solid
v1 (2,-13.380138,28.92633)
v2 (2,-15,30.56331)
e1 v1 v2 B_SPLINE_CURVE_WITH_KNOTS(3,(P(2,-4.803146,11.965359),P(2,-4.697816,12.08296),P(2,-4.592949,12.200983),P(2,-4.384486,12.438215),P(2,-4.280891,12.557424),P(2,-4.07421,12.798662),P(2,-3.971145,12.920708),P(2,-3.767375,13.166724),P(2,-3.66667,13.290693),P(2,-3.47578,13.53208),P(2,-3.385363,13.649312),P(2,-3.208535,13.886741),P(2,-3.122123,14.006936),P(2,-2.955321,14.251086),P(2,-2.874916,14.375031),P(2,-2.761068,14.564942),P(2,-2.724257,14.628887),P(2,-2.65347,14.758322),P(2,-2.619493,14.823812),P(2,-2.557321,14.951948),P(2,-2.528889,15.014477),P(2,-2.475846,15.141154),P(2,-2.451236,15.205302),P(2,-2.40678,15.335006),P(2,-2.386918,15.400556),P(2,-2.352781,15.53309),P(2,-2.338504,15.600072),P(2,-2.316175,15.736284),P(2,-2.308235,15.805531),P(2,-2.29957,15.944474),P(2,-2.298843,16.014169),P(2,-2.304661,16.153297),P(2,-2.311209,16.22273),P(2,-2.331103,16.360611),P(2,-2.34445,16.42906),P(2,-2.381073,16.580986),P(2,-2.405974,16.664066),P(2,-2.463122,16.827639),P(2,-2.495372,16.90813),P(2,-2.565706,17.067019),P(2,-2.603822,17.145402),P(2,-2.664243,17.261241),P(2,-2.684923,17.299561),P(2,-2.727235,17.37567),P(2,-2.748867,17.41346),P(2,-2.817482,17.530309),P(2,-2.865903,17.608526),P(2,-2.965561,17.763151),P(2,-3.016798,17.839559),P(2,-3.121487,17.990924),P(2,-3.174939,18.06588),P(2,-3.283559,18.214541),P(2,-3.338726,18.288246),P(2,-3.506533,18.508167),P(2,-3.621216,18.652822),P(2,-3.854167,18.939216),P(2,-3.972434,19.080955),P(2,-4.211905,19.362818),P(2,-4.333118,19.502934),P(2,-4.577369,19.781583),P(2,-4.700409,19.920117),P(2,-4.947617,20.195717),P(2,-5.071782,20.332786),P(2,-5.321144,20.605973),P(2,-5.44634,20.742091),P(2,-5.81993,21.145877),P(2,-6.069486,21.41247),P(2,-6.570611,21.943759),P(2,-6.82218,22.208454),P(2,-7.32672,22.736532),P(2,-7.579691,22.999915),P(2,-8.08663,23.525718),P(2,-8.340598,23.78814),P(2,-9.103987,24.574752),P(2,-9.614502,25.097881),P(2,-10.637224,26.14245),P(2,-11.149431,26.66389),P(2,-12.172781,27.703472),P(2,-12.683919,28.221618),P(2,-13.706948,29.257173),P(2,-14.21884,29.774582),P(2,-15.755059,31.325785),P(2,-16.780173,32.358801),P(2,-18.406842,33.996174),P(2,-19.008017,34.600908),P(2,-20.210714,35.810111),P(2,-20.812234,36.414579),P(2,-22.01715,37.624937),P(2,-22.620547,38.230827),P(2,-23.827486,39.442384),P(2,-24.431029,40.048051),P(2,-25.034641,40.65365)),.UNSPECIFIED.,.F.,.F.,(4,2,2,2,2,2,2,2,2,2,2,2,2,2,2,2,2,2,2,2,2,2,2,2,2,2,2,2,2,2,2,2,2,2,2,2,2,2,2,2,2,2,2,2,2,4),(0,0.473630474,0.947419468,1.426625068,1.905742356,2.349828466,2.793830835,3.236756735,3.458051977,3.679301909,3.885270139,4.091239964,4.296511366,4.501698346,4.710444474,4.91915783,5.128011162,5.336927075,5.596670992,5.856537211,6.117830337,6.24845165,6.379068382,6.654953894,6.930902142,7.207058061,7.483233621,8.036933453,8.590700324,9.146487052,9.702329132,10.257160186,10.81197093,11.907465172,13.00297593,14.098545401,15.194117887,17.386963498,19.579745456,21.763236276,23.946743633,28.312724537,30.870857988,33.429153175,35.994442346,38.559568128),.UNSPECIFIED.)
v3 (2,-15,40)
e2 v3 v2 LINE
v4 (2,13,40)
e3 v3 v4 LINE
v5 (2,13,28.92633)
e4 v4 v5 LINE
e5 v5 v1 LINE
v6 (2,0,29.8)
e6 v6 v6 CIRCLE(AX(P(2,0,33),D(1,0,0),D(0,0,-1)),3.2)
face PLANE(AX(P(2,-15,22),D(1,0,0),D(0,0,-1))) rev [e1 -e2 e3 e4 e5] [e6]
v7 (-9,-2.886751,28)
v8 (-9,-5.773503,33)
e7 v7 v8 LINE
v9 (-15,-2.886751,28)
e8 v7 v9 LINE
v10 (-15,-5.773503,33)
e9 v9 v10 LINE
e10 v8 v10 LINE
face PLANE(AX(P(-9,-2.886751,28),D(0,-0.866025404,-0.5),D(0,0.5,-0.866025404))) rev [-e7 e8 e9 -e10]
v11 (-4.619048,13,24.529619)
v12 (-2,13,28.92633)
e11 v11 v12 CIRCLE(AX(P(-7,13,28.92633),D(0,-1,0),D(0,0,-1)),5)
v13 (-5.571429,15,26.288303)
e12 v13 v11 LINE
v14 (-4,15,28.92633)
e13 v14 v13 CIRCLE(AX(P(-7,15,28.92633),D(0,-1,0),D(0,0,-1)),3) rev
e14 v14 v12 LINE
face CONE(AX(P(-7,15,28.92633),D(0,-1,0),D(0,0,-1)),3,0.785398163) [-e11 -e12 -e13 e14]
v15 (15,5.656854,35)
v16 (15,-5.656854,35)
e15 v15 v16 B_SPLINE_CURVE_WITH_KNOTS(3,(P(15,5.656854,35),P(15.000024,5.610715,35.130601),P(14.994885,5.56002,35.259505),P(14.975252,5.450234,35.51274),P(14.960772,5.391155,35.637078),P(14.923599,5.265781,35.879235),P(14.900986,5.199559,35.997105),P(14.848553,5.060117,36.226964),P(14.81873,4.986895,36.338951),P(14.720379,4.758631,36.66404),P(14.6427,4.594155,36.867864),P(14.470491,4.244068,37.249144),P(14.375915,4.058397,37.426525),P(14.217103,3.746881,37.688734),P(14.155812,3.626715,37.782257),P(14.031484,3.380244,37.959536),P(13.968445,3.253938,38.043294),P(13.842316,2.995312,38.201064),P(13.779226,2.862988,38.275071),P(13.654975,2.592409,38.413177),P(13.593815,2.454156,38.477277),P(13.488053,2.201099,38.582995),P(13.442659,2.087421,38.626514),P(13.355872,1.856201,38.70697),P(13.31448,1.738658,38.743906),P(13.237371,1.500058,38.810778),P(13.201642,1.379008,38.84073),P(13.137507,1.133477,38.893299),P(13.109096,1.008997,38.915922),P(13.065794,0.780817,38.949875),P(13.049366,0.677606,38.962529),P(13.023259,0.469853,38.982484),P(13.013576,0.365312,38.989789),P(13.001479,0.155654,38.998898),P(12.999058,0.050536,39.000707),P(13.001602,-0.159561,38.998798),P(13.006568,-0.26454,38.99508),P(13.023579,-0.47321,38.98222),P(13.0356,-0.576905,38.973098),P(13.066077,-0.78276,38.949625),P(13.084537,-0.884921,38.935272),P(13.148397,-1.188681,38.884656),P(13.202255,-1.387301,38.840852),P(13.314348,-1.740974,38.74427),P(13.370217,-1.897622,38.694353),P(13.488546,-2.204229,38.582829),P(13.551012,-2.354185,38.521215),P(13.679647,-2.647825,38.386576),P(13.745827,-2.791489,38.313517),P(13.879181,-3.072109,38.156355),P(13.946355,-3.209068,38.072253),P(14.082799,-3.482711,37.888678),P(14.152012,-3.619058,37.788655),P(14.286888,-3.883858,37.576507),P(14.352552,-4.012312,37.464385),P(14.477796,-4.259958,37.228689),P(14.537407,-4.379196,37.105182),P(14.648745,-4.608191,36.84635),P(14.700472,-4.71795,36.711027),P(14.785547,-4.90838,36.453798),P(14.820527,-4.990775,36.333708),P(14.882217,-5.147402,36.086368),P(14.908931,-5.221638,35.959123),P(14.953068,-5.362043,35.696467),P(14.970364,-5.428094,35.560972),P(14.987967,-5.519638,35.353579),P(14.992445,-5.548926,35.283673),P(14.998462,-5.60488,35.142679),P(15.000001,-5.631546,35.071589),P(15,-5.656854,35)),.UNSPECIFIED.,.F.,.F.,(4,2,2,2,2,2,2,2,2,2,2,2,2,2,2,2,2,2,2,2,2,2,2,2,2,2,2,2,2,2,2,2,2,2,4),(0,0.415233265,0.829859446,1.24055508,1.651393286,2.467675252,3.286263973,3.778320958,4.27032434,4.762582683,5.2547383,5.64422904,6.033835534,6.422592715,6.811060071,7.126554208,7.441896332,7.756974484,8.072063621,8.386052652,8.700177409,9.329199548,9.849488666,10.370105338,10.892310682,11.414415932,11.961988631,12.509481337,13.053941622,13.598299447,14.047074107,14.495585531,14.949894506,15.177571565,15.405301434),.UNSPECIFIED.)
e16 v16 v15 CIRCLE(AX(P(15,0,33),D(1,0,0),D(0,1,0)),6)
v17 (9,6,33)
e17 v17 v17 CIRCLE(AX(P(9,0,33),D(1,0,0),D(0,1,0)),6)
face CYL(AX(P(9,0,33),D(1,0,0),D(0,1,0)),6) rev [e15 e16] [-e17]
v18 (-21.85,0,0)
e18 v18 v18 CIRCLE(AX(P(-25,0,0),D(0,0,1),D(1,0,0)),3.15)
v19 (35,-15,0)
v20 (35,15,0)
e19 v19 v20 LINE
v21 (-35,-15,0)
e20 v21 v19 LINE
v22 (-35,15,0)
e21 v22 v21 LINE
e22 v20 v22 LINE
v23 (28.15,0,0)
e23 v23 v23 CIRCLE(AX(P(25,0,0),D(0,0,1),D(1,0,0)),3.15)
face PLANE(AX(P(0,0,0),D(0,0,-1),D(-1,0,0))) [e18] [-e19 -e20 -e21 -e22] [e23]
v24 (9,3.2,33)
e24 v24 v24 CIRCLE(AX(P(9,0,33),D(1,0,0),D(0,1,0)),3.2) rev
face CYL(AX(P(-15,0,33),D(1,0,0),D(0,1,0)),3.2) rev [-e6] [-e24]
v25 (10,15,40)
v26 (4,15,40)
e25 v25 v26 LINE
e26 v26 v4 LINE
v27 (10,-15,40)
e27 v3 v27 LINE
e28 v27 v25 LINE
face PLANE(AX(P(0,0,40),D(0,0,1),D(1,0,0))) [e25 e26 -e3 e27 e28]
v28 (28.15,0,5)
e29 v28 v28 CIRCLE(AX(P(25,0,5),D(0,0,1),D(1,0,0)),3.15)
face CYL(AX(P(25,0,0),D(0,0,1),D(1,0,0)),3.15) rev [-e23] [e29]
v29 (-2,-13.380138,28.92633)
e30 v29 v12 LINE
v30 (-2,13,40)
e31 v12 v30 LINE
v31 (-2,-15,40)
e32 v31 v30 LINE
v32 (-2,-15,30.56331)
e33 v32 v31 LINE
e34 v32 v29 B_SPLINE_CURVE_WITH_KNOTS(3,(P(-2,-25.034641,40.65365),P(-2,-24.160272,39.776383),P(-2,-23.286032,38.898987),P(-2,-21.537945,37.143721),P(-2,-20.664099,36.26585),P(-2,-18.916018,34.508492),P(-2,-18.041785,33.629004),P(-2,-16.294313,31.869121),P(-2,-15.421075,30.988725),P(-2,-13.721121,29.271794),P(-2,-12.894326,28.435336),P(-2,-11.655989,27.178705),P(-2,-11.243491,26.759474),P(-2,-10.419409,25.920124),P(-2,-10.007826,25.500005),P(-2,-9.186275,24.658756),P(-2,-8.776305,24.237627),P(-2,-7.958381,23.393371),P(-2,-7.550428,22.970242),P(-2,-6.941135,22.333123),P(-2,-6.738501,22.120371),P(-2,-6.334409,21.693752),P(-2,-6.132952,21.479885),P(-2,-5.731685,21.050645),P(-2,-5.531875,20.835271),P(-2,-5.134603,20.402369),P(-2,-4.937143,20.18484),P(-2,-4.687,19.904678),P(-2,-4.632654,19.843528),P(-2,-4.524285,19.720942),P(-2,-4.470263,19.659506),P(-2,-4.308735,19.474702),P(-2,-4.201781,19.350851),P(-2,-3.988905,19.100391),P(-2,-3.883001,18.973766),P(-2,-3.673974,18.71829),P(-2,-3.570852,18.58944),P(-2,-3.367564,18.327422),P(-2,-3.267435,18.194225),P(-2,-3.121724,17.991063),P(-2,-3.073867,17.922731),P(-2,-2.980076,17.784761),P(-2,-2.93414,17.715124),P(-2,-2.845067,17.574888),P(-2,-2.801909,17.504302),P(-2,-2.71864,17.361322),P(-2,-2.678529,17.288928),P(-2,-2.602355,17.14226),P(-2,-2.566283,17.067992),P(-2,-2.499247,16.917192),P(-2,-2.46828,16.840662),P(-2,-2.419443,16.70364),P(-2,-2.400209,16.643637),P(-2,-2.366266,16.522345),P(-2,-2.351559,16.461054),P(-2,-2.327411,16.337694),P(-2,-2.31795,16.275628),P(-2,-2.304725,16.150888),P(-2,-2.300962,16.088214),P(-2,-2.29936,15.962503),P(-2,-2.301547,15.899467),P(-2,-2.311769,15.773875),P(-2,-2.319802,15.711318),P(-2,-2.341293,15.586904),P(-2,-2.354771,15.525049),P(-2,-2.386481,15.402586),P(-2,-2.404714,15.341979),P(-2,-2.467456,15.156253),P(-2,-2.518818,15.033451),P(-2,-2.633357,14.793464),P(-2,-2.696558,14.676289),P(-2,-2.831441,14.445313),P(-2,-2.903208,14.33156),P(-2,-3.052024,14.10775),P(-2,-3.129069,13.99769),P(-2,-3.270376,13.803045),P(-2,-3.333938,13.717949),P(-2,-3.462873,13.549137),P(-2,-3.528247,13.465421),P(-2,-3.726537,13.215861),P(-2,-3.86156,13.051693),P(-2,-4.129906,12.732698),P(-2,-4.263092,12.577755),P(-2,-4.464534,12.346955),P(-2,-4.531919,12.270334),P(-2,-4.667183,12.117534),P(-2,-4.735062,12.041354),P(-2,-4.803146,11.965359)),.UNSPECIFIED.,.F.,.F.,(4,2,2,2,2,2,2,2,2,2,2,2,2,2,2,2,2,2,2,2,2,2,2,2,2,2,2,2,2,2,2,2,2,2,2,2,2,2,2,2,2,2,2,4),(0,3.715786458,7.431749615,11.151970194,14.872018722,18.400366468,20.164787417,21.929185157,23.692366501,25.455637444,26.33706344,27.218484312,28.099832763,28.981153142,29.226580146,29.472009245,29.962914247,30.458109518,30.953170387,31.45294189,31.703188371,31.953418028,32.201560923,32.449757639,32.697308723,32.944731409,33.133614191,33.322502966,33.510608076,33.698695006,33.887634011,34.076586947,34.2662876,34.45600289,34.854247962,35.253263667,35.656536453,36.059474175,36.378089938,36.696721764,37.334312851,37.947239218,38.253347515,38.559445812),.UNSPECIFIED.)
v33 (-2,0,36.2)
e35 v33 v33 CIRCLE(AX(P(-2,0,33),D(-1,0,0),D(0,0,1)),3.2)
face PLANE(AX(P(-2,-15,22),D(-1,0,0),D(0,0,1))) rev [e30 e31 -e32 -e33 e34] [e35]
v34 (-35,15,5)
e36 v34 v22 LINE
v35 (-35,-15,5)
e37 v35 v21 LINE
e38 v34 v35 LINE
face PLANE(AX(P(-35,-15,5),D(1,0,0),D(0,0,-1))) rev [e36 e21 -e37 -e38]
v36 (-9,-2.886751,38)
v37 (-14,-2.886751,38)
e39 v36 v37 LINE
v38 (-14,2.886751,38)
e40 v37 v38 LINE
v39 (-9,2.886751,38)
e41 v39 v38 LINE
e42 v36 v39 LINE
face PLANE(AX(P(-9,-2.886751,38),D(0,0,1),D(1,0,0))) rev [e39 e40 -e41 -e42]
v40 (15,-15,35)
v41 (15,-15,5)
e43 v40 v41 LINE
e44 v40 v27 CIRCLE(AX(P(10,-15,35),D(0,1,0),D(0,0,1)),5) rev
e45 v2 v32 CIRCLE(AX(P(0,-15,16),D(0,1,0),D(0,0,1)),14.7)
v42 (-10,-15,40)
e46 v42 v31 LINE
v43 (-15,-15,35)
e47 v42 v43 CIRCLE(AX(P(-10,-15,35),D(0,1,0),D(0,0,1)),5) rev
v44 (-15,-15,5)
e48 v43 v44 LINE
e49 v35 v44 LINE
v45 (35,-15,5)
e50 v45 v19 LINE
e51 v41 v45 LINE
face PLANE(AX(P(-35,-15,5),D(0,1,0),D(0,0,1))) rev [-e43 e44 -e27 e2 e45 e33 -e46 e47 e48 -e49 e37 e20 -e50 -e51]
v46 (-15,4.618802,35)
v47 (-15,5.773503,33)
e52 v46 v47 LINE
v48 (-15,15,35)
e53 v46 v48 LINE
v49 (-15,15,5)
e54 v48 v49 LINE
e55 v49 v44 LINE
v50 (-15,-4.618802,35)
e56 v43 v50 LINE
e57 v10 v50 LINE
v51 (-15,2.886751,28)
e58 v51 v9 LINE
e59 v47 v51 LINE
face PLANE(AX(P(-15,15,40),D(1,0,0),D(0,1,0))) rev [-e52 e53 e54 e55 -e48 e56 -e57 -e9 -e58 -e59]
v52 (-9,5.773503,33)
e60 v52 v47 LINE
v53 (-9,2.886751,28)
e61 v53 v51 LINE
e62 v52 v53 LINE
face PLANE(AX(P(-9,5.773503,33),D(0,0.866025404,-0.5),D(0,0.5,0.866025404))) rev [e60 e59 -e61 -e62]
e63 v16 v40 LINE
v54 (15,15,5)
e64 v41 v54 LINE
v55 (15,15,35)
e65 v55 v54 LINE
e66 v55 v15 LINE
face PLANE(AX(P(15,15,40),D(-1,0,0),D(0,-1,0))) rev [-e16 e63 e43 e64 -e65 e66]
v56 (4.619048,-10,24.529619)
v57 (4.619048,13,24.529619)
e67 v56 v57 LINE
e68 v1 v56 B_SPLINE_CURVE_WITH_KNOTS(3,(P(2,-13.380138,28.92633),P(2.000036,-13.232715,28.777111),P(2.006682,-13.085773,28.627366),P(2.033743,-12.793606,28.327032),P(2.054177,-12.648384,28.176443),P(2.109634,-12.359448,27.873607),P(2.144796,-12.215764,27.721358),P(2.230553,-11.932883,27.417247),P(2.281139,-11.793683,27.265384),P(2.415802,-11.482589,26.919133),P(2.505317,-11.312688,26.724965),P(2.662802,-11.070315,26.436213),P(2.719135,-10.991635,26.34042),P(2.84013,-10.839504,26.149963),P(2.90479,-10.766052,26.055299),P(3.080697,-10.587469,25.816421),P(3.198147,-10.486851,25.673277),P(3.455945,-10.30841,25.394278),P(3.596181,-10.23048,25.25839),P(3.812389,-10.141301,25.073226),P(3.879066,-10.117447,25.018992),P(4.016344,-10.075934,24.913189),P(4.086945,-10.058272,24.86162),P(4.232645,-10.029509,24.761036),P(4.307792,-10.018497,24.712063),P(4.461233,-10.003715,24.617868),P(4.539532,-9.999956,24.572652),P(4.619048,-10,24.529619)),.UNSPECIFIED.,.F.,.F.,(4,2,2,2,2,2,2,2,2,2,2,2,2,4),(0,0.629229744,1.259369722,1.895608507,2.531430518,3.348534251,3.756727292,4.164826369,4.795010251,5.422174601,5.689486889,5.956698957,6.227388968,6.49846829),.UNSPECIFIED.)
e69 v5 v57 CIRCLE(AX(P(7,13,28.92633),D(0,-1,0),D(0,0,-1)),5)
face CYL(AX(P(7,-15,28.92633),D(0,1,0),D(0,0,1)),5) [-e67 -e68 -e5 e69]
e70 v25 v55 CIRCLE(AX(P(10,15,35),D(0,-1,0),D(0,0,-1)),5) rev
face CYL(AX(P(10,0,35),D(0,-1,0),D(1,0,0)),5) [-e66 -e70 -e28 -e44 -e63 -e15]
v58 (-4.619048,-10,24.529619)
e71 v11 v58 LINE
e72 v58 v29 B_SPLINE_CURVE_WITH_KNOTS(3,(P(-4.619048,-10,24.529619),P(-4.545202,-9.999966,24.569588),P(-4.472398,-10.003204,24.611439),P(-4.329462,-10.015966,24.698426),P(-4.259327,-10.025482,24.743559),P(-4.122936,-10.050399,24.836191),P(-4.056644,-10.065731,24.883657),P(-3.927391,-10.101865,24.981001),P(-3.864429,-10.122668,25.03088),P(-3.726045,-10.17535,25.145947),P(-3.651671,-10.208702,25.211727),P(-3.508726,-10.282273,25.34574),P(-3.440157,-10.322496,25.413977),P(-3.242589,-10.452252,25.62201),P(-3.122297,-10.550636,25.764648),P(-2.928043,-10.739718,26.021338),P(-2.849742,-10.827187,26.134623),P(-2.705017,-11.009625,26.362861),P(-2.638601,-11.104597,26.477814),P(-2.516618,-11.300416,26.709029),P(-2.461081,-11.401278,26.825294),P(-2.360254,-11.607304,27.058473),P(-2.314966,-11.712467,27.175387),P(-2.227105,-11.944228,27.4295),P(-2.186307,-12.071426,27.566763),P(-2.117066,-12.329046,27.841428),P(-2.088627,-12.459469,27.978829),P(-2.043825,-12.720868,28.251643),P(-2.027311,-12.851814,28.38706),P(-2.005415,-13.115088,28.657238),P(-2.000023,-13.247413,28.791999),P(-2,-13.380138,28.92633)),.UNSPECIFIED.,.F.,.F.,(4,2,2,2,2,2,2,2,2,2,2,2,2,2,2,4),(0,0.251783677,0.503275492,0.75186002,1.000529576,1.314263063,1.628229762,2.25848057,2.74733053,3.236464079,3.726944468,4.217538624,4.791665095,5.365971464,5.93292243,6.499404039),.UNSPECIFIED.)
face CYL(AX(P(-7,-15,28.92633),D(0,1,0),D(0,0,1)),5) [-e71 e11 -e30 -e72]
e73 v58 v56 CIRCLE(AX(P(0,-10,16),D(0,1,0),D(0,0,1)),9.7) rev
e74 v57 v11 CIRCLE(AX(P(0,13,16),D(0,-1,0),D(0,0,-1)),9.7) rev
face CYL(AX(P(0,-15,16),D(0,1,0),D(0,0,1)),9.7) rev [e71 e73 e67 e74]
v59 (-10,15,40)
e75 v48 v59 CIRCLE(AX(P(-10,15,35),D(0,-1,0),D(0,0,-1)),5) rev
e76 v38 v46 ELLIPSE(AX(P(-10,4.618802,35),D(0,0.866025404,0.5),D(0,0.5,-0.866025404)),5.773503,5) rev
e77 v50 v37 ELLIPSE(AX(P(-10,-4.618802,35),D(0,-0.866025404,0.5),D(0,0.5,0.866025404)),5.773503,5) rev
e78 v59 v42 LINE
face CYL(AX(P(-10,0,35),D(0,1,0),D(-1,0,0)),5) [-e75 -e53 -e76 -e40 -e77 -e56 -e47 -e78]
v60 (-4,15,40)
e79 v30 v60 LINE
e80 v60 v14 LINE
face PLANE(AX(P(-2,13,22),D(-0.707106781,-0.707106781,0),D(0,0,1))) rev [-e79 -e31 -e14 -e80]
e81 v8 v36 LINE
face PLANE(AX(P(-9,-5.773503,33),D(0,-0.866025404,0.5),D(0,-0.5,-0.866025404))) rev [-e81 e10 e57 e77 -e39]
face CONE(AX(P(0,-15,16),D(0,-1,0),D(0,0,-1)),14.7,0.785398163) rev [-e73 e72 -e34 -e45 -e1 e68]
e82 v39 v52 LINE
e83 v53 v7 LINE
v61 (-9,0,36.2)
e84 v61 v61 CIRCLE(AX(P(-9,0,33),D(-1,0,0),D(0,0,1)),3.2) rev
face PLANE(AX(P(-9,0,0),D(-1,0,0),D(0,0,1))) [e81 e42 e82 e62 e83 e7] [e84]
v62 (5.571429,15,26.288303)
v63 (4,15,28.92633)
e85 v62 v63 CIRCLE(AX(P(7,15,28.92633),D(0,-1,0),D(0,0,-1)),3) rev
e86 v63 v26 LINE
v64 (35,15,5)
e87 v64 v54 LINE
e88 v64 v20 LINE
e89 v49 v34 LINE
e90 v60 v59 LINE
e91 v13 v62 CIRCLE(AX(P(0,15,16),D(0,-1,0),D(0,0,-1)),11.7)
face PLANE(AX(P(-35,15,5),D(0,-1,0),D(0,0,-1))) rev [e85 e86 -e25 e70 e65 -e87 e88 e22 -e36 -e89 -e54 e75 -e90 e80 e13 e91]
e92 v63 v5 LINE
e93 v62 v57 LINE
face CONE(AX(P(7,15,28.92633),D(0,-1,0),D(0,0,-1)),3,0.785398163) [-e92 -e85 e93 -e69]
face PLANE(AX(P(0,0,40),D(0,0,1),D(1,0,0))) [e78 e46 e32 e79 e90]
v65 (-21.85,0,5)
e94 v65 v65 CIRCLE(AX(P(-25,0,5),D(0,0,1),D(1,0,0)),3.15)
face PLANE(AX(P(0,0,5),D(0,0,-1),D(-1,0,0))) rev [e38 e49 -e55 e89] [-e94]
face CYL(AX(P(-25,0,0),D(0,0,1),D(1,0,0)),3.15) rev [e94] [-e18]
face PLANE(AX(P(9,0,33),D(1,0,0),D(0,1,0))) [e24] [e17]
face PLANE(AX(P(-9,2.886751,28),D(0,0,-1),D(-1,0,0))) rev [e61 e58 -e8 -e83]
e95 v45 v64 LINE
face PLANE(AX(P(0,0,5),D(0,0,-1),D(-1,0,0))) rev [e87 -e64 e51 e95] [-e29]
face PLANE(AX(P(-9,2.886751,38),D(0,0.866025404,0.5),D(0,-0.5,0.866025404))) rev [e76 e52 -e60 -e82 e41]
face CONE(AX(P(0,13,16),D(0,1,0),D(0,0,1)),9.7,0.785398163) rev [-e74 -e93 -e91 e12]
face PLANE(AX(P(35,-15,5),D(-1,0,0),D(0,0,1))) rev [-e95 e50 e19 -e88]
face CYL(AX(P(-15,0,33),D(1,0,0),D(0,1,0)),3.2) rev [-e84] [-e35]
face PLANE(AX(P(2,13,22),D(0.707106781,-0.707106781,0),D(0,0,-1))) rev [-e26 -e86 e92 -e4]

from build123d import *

# Parameters (mm, degrees)
SKETCH_1_W          = 70
SKETCH_1_H          = 30
EXTRUDE_1_DEPTH     = 5
SKETCH_2_R          = 3.15
CUT_EXTRUDE_1_DEPTH = 5
SKETCH_3_W          = 30
SKETCH_3_H          = 30
EXTRUDE_2_DEPTH     = 35
SKETCH_4_R          = 9.7
CUT_EXTRUDE_2_DEPTH = 30
CHAMFER_1_SIZE      = 5
SKETCH_5_W          = 4
SKETCH_5_H          = 18
CUT_EXTRUDE_3_DEPTH = 30
FILLET_1_R          = 5
SKETCH_6_R          = 3.2
CUT_EXTRUDE_4_DEPTH = 30
SKETCH_7_R          = 6
CUT_EXTRUDE_5_DEPTH = 6
CUT_EXTRUDE_6_DEPTH = 6
FILLET_2_R          = 5
CHAMFER_2_SIZE      = 2


with BuildPart() as part:
    # 草图1 → 凸台-拉伸1 (new body)
    with BuildSketch(Plane.XY):
        Rectangle(SKETCH_1_W, SKETCH_1_H)
    extrude(amount=EXTRUDE_1_DEPTH)

    # 草图2 → 切除-拉伸1 (cut)
    with BuildSketch(Plane.XY.offset(5)):
        with Locations((-25, 0)):
            Circle(SKETCH_2_R)
        with Locations((25, 0)):
            Circle(SKETCH_2_R)
    extrude(amount=-CUT_EXTRUDE_1_DEPTH, mode=Mode.SUBTRACT)

    # 草图3 → 凸台-拉伸2 (add)
    with BuildSketch(Plane.XY.offset(5)):
        Rectangle(SKETCH_3_W, SKETCH_3_H)
    extrude(amount=EXTRUDE_2_DEPTH)

    # 草图4 → 切除-拉伸2 (cut)
    with BuildSketch(Plane(origin=(0, 15, 0), x_dir=(1, 0, 0), z_dir=(0, 1, 0))):
        with Locations(Location((0, -16, 0), (0, 0, 270))):
            Circle(SKETCH_4_R)
    extrude(amount=-CUT_EXTRUDE_2_DEPTH, mode=Mode.SUBTRACT)

    # 倒角1
    chamfer_1_edges = [part.edges().sort_by_distance(p)[0] for p in [
        (0, -15, 6.3),
    ]]
    chamfer(chamfer_1_edges, length=CHAMFER_1_SIZE)

    # 草图5 → 切除-拉伸3 (cut)
    with BuildSketch(Plane(origin=(0, 15, 0), x_dir=(1, 0, 0), z_dir=(0, 1, 0))):
        with Locations((0, -31)):
            Rectangle(SKETCH_5_W, SKETCH_5_H)
    extrude(amount=-CUT_EXTRUDE_3_DEPTH, mode=Mode.SUBTRACT)

    # 圆角1
    fillet_1_edges = [part.edges().sort_by_distance(p)[0] for p in [
        (2, 2.5, 25.491575212),
        (-2, 2.5, 25.491575212),
    ]]
    fillet(fillet_1_edges, radius=FILLET_1_R)

    # 草图6 → 切除-拉伸4 (cut)
    with BuildSketch(Plane(origin=(15, 0, 0), x_dir=(0, 0, -1), z_dir=(1, 0, 0))):
        with Locations(Location((-33, 0, 0), (0, 0, 90))):
            Circle(SKETCH_6_R)
    extrude(amount=-CUT_EXTRUDE_4_DEPTH, mode=Mode.SUBTRACT)

    # 草图7 → 切除-拉伸5 (cut)
    with BuildSketch(Plane(origin=(15, 0, 0), x_dir=(0, 0, -1), z_dir=(1, 0, 0))):
        with Locations(Location((-33, 0, 0), (0, 0, 90))):
            Circle(SKETCH_7_R)
    extrude(amount=-CUT_EXTRUDE_5_DEPTH, mode=Mode.SUBTRACT)

    # 草图8 → 切除-拉伸6 (cut)
    with BuildSketch(Plane.ZY.offset(15)):
        Polygon((28, -2.886751346), (33, -5.773502692), (38, -2.886751346), (38, 2.886751346), (33, 5.773502692), (28, 2.886751346), align=None)
    extrude(amount=-CUT_EXTRUDE_6_DEPTH, mode=Mode.SUBTRACT)

    # 圆角2
    # the kernel refuses this fillet: 5 mm, written as the material it takes off along each edge
    with BuildSketch(Plane(origin=(-15, -27.5, 40), x_dir=(1, 0, 0), z_dir=(0, 1, 0)), Plane(origin=(15, 27.5, 40), x_dir=(-1, 0, 0), z_dir=(0, -1, 0))) as fillet_2_piece_1:
        with BuildLine():
            CenterArc((FILLET_2_R, FILLET_2_R), FILLET_2_R, 180, 90)
            Line((0, FILLET_2_R), (0, 0))
            Line((0, 0), (FILLET_2_R, 0))
        make_face()
    extrude(amount=55, mode=Mode.SUBTRACT)

    # 倒角2
    chamfer_2_edges = [part.edges().sort_by_distance(p)[0] for p in [
        (2, 15, 34.463164859),
        (0, 15, 6.3),
        (-2, 15, 34.463164859),
        (-2.704376535, 15, 26.36749814),
        (2.704376535, 15, 26.36749814),
    ]]
    chamfer(chamfer_2_edges, length=CHAMFER_2_SIZE)


solid = part.part
